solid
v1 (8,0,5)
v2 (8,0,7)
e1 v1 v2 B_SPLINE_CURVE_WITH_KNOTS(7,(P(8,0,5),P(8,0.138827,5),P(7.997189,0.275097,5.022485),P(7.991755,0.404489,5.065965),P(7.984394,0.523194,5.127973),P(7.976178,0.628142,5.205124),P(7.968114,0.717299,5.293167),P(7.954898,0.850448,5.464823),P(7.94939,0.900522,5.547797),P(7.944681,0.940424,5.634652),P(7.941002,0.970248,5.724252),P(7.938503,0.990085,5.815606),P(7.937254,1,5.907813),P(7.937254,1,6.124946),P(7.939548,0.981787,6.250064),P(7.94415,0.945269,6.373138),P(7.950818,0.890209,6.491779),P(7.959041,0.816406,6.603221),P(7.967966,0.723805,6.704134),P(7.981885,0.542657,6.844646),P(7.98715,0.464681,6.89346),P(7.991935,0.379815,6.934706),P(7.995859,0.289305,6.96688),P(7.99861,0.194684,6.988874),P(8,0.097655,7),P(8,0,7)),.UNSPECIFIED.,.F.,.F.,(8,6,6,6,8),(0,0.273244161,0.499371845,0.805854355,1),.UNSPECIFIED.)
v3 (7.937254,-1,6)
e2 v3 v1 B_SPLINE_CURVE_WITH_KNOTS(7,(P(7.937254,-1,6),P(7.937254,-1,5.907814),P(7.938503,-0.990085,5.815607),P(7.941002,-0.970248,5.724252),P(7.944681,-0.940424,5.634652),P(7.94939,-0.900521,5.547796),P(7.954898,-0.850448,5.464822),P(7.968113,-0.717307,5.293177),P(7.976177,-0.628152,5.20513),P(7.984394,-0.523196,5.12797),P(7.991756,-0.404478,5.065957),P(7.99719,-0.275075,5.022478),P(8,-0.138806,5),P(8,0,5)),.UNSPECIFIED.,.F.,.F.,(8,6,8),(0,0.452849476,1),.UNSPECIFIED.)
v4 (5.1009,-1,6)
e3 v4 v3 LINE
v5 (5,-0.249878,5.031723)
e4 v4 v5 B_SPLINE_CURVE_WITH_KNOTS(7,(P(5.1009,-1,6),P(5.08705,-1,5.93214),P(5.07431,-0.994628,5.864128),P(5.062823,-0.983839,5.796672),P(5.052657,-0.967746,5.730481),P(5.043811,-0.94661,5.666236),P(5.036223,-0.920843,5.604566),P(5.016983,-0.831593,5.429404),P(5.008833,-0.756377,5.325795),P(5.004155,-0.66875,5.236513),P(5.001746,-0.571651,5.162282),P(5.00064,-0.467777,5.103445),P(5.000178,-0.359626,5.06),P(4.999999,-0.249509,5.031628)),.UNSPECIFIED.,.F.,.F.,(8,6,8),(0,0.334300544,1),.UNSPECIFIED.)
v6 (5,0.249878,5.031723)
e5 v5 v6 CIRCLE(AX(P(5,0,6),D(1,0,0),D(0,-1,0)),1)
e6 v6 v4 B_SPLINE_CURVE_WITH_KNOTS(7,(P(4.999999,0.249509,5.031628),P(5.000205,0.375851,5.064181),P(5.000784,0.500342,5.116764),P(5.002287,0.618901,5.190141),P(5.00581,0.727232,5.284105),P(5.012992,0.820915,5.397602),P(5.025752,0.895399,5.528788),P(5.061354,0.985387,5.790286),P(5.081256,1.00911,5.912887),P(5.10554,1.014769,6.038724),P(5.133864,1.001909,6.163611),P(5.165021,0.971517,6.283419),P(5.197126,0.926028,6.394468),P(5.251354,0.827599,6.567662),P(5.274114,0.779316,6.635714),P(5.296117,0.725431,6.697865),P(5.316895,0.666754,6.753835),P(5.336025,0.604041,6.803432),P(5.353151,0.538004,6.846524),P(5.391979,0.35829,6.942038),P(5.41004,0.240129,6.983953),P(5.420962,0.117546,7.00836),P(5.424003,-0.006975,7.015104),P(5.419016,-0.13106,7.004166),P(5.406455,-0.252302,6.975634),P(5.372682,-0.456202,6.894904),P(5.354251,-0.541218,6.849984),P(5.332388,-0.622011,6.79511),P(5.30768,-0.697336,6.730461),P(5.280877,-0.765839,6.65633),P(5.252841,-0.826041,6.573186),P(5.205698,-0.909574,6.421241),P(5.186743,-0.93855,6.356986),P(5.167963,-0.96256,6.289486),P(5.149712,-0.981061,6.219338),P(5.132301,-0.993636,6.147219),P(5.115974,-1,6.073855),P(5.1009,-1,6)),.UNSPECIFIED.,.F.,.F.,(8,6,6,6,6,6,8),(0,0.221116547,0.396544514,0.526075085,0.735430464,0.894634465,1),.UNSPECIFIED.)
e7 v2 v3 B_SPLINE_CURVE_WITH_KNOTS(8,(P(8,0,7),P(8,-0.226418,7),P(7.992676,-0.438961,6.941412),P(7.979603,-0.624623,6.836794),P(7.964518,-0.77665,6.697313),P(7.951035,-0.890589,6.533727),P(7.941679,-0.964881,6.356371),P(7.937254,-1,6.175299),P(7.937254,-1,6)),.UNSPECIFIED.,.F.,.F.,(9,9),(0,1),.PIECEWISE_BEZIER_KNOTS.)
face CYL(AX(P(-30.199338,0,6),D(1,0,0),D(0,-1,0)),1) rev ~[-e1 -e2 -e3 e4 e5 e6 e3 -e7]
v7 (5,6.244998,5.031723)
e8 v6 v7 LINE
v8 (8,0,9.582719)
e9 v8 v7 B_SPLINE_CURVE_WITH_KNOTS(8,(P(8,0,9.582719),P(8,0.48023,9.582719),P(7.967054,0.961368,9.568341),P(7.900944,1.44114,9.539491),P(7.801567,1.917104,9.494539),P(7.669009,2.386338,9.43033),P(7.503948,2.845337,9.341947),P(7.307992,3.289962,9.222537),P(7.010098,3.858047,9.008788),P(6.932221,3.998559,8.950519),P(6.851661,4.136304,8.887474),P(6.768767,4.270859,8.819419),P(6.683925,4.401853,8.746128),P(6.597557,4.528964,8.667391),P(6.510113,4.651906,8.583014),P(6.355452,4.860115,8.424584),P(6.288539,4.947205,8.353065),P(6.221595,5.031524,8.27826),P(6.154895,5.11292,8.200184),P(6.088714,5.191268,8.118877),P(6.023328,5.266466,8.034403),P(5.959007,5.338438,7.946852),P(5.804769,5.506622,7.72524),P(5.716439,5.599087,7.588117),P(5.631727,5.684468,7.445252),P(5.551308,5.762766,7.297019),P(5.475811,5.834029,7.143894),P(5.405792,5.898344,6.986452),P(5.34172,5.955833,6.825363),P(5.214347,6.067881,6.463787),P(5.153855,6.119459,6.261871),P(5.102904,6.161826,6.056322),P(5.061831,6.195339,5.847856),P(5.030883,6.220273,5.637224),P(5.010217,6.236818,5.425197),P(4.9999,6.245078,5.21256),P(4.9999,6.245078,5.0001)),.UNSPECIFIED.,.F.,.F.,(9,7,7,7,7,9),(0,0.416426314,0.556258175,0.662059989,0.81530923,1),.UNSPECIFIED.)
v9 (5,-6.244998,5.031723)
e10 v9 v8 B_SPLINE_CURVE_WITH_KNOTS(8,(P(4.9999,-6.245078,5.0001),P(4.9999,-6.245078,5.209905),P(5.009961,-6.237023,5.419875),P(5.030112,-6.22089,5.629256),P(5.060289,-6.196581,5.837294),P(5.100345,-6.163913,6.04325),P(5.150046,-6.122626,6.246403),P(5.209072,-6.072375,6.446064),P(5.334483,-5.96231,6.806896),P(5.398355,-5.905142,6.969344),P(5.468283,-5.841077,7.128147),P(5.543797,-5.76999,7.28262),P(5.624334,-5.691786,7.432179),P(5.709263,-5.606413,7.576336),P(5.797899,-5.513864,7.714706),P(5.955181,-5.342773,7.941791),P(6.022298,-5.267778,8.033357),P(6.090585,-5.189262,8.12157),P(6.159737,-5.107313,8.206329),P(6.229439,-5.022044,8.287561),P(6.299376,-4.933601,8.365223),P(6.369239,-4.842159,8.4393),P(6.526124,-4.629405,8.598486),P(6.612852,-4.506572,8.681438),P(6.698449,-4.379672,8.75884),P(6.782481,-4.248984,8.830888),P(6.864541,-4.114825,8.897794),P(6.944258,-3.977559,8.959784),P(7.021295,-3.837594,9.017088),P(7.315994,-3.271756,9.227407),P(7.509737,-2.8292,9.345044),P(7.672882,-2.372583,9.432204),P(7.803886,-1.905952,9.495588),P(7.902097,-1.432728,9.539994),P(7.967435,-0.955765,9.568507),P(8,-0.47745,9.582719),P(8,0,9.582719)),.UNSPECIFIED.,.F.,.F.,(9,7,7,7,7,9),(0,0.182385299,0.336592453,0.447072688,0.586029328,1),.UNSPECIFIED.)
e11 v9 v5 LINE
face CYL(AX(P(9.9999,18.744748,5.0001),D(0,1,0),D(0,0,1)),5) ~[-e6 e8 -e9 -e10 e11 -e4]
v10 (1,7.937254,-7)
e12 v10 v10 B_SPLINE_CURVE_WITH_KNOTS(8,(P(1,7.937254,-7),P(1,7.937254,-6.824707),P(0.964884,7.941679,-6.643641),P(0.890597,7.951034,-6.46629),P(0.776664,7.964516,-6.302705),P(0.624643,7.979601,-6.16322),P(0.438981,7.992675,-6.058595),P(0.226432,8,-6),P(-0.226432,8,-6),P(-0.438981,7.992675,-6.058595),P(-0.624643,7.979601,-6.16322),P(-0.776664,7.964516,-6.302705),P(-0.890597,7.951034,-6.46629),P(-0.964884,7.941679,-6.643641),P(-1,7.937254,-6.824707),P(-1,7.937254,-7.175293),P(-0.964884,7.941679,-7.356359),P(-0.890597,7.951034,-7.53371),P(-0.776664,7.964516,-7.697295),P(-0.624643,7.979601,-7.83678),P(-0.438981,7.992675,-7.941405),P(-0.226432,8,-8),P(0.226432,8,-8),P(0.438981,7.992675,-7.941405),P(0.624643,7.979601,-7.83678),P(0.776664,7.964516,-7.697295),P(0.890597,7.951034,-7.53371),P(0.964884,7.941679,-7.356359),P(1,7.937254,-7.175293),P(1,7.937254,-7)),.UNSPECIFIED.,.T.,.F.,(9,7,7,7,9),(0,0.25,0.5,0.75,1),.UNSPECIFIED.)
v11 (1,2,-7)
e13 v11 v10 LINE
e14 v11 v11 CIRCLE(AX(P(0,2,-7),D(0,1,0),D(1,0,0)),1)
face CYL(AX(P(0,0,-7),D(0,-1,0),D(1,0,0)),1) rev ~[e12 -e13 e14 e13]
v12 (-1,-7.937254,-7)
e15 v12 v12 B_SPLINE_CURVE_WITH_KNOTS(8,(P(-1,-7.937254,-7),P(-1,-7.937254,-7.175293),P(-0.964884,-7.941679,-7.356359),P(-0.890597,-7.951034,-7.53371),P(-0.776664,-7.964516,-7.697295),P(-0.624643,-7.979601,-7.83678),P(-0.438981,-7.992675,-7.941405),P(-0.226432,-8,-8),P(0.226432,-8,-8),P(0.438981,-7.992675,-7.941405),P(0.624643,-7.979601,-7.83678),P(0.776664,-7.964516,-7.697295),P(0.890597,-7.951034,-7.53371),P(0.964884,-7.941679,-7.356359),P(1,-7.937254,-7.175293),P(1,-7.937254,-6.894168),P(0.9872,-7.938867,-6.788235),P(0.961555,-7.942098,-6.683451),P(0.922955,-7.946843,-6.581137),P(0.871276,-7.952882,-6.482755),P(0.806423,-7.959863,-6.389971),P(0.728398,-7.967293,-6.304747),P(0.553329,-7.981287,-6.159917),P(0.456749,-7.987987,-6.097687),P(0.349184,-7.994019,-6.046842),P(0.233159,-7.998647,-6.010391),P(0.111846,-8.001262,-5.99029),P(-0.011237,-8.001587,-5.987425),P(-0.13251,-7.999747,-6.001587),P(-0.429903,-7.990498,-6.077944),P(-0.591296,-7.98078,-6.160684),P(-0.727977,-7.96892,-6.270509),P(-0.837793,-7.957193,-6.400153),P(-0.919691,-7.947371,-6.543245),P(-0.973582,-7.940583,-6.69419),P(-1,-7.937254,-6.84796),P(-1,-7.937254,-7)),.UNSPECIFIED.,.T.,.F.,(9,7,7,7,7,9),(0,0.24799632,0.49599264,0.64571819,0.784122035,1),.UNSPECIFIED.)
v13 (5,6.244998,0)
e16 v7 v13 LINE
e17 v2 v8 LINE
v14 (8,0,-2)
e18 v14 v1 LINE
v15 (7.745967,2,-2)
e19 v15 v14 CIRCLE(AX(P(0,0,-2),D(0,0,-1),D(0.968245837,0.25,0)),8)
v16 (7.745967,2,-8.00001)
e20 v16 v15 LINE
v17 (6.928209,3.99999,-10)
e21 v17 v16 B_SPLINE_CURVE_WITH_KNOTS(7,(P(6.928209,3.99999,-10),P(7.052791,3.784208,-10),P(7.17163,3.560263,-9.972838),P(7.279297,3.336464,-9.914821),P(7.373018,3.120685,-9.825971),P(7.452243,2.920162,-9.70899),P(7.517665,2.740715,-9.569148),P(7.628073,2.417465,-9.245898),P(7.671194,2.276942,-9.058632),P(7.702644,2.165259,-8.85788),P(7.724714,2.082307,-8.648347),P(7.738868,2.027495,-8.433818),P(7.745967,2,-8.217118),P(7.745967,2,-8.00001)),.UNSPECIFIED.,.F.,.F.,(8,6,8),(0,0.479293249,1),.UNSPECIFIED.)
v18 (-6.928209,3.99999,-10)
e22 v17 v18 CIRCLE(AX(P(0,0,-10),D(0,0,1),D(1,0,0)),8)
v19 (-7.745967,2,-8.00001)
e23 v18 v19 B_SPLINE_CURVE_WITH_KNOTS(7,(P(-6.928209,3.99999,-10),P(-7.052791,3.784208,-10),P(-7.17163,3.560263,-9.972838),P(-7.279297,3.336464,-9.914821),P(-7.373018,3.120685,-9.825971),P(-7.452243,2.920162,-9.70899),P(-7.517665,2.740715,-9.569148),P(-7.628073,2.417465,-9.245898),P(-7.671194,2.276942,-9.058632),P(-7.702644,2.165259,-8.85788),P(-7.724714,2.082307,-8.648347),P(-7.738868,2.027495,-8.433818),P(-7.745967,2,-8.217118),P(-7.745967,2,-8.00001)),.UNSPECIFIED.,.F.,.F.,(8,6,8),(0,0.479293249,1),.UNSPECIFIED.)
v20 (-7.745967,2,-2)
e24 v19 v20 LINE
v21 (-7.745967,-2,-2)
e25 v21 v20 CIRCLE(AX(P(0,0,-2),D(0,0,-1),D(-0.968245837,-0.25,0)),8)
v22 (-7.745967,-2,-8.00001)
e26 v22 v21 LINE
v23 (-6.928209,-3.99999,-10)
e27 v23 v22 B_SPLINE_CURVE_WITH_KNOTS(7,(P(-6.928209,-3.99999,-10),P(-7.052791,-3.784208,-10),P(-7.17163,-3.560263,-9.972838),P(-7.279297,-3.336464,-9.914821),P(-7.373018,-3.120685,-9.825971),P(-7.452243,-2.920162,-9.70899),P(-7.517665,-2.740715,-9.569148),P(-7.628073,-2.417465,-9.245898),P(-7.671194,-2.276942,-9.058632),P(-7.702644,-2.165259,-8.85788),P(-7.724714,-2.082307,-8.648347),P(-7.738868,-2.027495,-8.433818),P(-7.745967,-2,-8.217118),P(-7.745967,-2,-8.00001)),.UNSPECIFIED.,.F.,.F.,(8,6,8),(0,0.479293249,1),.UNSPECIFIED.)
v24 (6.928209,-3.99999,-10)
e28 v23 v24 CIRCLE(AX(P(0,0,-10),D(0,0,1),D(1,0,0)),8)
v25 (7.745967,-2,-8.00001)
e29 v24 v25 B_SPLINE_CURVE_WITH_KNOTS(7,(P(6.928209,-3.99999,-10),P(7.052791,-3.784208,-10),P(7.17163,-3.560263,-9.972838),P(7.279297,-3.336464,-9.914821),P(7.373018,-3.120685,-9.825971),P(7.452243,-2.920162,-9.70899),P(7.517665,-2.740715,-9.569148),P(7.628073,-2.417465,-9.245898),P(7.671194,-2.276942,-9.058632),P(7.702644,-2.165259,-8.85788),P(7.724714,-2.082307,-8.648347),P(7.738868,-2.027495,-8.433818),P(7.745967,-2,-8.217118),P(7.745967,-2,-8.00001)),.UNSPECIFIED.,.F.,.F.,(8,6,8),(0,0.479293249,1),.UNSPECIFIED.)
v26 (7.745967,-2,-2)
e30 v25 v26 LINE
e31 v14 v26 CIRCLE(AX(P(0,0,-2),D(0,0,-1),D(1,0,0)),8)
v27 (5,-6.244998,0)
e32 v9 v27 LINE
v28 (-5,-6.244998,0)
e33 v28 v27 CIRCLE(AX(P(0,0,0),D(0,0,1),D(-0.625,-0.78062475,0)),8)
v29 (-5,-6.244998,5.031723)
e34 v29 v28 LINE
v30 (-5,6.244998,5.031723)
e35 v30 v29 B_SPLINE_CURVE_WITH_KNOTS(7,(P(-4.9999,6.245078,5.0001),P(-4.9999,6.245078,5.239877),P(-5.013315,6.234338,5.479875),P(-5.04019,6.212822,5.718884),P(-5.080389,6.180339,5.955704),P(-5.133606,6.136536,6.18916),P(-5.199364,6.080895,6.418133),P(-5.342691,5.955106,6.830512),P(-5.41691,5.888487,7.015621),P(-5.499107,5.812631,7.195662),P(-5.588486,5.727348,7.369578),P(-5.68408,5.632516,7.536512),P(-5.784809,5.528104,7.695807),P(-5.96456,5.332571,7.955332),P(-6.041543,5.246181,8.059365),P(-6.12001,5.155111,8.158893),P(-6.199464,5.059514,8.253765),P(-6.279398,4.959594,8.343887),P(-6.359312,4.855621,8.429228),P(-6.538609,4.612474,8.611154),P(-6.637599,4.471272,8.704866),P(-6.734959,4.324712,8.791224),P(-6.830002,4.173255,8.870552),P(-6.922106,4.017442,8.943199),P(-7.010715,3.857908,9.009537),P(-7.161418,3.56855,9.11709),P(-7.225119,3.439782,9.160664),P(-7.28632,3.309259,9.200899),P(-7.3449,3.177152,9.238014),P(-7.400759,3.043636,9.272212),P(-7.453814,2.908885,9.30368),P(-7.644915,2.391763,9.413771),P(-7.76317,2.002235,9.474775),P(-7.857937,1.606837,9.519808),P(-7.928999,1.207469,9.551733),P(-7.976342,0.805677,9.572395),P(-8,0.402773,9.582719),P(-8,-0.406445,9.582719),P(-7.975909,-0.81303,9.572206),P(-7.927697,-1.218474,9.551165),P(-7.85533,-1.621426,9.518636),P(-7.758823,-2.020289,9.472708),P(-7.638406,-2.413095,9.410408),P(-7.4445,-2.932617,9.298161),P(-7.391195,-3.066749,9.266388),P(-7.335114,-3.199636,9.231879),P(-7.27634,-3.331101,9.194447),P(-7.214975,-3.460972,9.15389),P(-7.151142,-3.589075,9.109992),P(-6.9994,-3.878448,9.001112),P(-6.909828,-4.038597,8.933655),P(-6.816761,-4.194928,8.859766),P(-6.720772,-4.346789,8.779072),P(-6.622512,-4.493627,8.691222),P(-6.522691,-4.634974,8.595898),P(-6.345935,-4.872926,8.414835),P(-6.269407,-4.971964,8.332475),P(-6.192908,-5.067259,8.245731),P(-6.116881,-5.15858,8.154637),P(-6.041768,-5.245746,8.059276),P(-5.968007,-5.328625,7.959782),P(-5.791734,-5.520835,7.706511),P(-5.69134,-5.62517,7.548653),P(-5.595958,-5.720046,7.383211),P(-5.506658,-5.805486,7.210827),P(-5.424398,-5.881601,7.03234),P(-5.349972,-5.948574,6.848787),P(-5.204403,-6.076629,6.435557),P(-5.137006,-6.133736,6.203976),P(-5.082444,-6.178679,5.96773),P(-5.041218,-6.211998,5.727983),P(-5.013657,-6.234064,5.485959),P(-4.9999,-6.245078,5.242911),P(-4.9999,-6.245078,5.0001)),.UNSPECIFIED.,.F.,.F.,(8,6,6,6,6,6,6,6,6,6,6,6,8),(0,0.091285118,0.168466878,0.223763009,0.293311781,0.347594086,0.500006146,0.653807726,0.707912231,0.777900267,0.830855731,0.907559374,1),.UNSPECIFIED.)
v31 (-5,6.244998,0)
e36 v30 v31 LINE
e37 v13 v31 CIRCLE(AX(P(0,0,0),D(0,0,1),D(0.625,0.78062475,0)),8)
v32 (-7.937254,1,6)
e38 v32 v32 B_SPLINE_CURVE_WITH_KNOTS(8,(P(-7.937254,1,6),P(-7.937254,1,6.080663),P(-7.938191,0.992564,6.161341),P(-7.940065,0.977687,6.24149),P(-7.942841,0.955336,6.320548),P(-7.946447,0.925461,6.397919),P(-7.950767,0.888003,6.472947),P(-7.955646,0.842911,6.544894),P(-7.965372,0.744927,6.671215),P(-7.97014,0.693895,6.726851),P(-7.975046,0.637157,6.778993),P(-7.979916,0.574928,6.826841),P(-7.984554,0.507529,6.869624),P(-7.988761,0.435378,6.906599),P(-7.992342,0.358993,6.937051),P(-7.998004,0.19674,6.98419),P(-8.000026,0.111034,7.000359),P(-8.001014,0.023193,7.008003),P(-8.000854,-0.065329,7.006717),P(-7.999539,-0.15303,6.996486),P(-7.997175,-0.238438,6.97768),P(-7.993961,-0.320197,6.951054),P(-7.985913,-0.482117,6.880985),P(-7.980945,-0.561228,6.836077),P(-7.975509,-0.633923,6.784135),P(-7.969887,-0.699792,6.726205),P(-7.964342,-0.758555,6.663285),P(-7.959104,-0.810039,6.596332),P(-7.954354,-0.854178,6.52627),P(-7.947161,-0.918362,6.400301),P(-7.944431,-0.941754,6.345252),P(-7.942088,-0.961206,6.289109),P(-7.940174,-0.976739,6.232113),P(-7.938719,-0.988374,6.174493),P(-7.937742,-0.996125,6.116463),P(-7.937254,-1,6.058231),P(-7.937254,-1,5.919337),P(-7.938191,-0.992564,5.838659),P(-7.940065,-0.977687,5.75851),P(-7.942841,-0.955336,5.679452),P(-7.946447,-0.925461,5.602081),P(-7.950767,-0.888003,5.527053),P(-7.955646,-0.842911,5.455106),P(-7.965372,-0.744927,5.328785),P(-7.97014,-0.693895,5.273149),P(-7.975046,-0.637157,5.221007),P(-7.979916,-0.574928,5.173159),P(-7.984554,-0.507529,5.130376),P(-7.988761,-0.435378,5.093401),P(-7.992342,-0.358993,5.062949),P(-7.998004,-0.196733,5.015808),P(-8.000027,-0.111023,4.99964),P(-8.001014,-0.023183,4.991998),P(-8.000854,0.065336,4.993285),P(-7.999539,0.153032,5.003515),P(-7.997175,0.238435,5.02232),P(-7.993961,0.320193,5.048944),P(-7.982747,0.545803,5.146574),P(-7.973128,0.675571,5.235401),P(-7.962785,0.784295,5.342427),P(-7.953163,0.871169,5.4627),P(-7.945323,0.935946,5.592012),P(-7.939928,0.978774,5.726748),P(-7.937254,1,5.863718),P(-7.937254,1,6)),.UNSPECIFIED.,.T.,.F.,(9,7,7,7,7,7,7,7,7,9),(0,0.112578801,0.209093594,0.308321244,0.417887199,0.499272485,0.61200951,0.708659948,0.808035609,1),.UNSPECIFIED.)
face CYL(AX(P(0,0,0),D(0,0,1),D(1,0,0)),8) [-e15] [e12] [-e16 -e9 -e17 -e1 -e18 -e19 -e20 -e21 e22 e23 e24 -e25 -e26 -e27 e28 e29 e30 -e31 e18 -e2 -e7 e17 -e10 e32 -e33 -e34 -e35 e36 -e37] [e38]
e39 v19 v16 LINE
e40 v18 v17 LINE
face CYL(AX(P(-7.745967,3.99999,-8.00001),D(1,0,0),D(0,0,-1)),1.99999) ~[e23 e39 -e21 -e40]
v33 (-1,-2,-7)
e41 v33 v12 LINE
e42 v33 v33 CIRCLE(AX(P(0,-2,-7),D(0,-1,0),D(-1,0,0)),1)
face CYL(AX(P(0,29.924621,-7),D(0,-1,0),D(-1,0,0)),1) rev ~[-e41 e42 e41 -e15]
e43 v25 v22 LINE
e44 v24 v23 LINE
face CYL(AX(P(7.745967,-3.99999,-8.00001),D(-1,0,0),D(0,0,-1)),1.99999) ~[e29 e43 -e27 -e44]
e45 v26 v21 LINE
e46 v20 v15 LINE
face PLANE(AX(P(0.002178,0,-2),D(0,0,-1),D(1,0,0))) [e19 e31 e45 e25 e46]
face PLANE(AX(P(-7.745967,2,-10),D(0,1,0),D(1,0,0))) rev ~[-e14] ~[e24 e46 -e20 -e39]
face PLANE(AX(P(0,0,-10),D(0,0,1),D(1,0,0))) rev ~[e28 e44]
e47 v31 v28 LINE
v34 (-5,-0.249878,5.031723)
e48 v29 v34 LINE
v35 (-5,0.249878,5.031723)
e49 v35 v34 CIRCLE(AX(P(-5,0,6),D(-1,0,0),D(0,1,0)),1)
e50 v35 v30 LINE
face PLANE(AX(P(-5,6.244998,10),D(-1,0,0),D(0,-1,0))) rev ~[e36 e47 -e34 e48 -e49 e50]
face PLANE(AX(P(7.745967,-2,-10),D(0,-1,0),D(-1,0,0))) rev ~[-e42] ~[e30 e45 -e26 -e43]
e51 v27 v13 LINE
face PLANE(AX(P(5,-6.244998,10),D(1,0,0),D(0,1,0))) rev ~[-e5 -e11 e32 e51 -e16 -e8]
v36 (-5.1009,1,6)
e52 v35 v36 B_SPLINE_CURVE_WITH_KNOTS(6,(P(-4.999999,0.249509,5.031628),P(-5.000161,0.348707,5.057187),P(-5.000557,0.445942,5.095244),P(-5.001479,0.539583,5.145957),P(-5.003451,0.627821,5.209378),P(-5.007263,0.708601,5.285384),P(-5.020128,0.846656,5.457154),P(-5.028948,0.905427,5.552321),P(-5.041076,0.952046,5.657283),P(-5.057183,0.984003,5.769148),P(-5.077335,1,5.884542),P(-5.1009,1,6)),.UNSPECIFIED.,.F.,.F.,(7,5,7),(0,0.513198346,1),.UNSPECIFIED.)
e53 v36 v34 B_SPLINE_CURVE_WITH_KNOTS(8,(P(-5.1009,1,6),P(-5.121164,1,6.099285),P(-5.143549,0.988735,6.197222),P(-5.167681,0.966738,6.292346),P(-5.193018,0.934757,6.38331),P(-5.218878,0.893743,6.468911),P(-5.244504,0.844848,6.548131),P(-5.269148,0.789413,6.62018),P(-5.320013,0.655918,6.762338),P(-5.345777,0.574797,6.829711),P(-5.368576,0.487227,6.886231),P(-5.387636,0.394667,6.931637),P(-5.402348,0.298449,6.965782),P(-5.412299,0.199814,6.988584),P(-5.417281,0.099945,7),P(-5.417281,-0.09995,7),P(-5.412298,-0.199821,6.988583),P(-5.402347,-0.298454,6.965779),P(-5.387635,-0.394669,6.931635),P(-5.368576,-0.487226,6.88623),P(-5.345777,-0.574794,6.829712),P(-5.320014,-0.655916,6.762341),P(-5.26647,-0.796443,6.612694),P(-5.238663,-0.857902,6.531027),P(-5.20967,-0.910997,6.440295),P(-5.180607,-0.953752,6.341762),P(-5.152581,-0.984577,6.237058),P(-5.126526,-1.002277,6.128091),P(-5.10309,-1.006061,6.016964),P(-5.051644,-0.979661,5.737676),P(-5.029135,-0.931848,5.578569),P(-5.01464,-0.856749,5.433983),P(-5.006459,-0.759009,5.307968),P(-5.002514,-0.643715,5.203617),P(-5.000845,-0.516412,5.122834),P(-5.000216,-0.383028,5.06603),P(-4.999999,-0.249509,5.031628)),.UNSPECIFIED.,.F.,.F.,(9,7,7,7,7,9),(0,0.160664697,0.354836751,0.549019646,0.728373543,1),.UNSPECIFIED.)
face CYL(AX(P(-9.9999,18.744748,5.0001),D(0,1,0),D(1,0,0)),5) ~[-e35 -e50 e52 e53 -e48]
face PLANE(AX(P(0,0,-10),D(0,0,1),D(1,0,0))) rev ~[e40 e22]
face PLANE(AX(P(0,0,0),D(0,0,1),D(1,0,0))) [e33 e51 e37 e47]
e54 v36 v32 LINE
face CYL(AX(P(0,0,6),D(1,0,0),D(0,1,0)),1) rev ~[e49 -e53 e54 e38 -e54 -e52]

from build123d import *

# Parameters (mm, degrees)
F0_R        = 8
F1_DEPTH    = 10
F3_DEPTH    = 10
F5_D        = 2
F5_DEPTH    = 8.001
F6_D        = 2
F7_T1_DEPTH = 37.4894960018
F9_DEPTH    = 8
F11_D       = 2
F11_DEPTH   = 8.0010001
F13_D       = 2
F14_R       = 1.99999


# Not quite as in the source:
# - a fillet or chamfer that OpenCascade refuses, or shapes differently, is made with other operations: its cross-section is extruded or revolved along the edge and cut away or added
# - a fillet or chamfer is up to 0.001 mm smaller than in the source, because OpenCascade refuses the exact size


with BuildPart() as f1:
    # F0 (on Top) → F1 (new body, symmetric)
    with BuildSketch(Plane.XY):
        Circle(F0_R)
    extrude(amount=F1_DEPTH, both=True)

    # F2 (on face) → F3 (cut)
    with BuildSketch(Plane.XY.offset(10)):
        with BuildLine():
            ThreePointArc((5, 6.2449979984), (0, 8), (-5, 6.2449979984))
            Line((-5, 6.2449979984), (-5, -6.2449979984))
            ThreePointArc((-5, -6.2449979984), (0, -8), (5, -6.2449979984))
            Line((5, -6.2449979984), (5, 6.2449979984))
        make_face()
    extrude(amount=-F3_DEPTH, mode=Mode.SUBTRACT)

    # F5 (through all, one way)
    with BuildSketch(Plane.YZ):
        with Locations((0, 6)):
            Circle(F5_D / 2)
    extrude(amount=-F5_DEPTH, mode=Mode.SUBTRACT)

    # F6 (through all)
    with Locations(Plane(origin=(0, 0, 0), x_dir=(0, 1, 0), z_dir=(-1, 0, 0))):
        with Locations((0, -6)):
            Hole(F6_D / 2)

    # F7: fillet of radius 5 on 2 edges, made by hand

    # F7_s2 → F7_t1 (cut)
    with BuildSketch(Plane.XZ.offset(-18.7447480009)):
        with BuildLine():
            ThreePointArc((-4.9999, 5.0001), (-6.4643660941, 8.5356339059), (-9.9999, 10.0001))
            Line((-9.9999, 10.0001), (-9.9999, 10.1001))
            ThreePointArc((-9.9999, 10.1001), (-7.49995, 10.1), (-5, 10.1))
            Line((-5, 10.1), (-4.9, 10))
            ThreePointArc((-4.9, 10), (-4.9, 7.50005), (-4.8999, 5.0001))
            Line((-4.8999, 5.0001), (-4.9999, 5.0001))
        make_face()
        with BuildLine():
            ThreePointArc((9.9999, 10.0001), (6.4643660941, 8.5356339059), (4.9999, 5.0001))
            Line((4.9999, 5.0001), (4.8999, 5.0001))
            ThreePointArc((4.8999, 5.0001), (4.9, 7.50005), (4.9, 10))
            Line((4.9, 10), (5, 10.1))
            ThreePointArc((5, 10.1), (7.49995, 10.1), (9.9999, 10.1001))
            Line((9.9999, 10.1001), (9.9999, 10.0001))
        make_face()
    extrude(amount=F7_T1_DEPTH, mode=Mode.SUBTRACT)

    # F8 (on face) → F9 (cut)
    with BuildSketch(Plane(origin=(0, 0, -10), x_dir=(1, 0, 0), z_dir=(0, 0, -1))):
        with BuildLine():
            Line((7.7459666924, 2), (-7.7459666924, 2))
            ThreePointArc((-7.7459666924, 2), (-8, 0), (-7.7459666924, -2))
            Line((-7.7459666924, -2), (7.7459666924, -2))
            ThreePointArc((7.7459666924, -2), (7.9362375701, -1.0080343399), (8, 0))
            ThreePointArc((8, 0), (7.9362375701, 1.0080343399), (7.7459666924, 2))
        make_face()
    extrude(amount=-F9_DEPTH, mode=Mode.SUBTRACT)

    # F11 (through all, one way)
    with BuildSketch(Plane.XZ):
        with Locations((0, -7)):
            Circle(F11_D / 2)
    extrude(amount=-F11_DEPTH, mode=Mode.SUBTRACT)

    # F13 (through all)
    with Locations(Plane(origin=(0, 0, 0), x_dir=(1, 0, 0), z_dir=(0, 1, 0))):
        with Locations((0, 7)):
            Hole(F13_D / 2)

    # F14 (radius 2 in the source; OpenCascade refuses exactly that, so slightly less here)
    f14_edges = [f1.edges().sort_by_distance(p)[0] for p in [
        (0, -2, -10),
        (0, 2, -10),
    ]]
    fillet(f14_edges, radius=F14_R)


solid = f1.part
